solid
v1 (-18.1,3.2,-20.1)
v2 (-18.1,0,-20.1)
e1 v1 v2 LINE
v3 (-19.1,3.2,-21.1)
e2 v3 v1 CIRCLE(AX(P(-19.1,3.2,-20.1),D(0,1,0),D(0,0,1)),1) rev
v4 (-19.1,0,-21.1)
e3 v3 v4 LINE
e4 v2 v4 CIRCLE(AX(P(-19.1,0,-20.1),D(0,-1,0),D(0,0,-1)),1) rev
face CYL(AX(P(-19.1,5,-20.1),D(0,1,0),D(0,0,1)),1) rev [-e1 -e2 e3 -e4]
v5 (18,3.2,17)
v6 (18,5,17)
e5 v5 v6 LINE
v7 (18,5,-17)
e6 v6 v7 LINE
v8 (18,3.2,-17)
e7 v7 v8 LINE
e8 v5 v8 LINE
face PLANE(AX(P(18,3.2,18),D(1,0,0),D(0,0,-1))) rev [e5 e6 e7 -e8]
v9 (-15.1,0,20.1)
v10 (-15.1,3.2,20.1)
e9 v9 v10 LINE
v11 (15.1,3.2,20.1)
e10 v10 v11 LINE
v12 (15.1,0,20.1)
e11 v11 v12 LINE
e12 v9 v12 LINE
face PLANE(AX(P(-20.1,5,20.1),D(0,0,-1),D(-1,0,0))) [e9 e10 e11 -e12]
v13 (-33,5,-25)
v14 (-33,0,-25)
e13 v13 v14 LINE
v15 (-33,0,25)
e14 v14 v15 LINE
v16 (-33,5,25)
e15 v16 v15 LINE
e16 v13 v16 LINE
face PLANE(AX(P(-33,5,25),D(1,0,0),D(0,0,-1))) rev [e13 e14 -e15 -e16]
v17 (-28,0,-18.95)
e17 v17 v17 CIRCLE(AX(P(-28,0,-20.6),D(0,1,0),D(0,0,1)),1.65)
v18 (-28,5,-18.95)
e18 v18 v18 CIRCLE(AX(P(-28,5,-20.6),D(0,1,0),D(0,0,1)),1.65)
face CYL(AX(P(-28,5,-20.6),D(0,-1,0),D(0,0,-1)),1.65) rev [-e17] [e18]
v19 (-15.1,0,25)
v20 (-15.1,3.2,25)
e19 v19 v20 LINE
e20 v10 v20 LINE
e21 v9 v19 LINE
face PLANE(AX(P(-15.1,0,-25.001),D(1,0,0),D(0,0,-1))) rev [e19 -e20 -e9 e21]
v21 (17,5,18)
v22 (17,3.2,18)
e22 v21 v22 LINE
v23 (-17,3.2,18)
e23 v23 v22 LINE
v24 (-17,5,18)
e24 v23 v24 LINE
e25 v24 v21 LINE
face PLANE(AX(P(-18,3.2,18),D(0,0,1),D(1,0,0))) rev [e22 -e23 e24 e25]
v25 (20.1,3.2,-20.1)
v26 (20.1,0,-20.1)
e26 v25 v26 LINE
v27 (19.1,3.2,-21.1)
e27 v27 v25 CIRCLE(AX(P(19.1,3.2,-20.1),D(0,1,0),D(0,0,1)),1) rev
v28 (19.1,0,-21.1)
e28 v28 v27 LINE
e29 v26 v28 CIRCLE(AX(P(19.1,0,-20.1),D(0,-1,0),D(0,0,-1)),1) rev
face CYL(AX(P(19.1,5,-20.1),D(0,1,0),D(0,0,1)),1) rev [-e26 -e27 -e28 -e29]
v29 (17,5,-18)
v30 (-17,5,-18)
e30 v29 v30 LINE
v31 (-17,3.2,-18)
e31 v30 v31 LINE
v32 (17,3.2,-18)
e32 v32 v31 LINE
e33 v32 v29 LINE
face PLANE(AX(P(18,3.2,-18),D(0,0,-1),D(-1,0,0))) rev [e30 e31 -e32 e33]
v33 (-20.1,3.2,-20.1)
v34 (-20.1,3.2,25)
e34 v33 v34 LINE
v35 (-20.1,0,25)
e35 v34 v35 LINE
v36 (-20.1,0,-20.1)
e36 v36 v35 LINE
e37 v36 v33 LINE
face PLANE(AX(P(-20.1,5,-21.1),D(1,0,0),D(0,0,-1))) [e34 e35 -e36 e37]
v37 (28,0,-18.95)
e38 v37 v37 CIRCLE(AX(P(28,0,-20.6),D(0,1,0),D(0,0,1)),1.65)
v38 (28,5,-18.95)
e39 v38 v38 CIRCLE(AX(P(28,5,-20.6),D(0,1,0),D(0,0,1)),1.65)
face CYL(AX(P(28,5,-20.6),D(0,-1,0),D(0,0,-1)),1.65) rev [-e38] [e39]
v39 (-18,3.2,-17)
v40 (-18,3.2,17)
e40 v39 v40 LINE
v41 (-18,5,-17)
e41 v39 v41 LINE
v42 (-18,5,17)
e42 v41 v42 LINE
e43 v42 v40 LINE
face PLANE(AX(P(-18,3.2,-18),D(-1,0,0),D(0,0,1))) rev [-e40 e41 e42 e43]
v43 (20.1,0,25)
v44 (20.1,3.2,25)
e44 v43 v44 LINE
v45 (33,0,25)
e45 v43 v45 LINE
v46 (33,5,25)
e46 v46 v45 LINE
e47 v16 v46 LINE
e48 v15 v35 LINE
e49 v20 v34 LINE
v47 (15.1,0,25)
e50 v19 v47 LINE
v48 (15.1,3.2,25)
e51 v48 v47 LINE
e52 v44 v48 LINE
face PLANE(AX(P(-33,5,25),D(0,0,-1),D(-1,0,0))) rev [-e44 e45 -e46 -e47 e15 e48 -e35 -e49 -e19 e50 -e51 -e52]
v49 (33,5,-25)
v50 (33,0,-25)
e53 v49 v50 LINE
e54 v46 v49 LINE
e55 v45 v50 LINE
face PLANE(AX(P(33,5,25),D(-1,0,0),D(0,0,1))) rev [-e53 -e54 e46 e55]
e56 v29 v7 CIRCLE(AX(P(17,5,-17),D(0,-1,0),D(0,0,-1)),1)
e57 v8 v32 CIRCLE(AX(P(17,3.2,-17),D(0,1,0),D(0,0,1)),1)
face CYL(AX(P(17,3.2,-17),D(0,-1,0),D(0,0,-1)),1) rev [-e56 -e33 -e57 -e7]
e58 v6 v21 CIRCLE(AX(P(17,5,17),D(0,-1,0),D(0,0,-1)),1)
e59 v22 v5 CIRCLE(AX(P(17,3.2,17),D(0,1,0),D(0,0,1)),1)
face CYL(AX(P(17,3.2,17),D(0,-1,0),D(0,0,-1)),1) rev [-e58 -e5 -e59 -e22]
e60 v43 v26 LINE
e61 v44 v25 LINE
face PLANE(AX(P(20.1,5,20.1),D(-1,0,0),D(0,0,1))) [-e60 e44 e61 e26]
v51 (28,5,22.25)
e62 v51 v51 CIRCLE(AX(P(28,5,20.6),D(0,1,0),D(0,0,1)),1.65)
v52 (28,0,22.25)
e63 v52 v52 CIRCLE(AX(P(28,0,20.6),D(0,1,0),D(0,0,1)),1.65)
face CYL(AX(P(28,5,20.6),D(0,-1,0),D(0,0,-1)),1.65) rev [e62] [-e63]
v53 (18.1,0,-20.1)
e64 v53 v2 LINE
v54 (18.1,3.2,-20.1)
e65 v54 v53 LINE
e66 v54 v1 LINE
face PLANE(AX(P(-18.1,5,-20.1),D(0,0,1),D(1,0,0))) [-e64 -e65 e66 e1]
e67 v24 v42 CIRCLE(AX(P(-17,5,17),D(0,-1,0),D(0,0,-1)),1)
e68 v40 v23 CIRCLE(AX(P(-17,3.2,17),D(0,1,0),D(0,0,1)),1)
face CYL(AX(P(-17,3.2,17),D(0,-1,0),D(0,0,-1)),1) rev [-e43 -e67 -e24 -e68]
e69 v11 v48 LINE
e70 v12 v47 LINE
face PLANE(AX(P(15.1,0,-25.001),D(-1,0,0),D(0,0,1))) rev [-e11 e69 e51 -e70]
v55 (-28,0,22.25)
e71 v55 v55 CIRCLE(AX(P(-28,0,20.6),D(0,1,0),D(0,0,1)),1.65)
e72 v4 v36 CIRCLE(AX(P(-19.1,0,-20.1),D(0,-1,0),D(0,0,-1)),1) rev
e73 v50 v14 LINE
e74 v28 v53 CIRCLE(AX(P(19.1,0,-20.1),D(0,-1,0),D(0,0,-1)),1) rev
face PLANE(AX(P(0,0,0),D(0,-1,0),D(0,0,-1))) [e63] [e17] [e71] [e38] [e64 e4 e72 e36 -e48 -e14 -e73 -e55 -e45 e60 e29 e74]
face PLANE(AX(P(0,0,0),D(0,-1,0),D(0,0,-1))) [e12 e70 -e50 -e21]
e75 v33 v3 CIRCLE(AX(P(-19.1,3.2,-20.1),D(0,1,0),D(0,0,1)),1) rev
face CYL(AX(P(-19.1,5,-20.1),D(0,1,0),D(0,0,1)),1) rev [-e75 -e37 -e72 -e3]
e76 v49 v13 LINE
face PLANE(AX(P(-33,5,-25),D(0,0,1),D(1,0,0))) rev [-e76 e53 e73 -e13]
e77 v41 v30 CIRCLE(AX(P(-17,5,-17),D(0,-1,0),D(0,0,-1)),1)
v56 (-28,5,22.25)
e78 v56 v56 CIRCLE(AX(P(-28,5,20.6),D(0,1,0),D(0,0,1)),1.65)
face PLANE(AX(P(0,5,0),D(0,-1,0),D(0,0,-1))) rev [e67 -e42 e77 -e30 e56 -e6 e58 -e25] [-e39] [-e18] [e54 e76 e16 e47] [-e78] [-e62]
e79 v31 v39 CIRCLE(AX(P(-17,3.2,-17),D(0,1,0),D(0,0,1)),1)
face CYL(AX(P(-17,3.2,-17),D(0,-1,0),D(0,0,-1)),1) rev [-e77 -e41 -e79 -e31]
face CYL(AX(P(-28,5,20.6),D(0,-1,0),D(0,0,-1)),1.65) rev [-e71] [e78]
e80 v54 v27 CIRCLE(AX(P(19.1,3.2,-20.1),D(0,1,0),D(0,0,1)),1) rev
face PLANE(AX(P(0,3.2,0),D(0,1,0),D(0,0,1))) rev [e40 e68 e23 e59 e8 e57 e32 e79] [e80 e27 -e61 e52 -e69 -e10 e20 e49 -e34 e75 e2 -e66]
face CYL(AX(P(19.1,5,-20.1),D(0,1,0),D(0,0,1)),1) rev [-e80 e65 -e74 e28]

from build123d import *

# Parameters (mm, degrees)
SKETCH1_W           = 66
SKETCH1_H           = 50
SKETCH1_R           = 1.65
BOSS_EXTRUDE1_DEPTH = 5
SKETCH2_W           = 36
SKETCH2_H           = 36
BOSS_EXTRUDE2_DEPTH = 1.8
CUT_EXTRUDE1_REACH  = 62.117
SKETCH3_W           = 5
SKETCH3_H           = 3.2
FILLET1_R           = 1


with BuildPart() as part:
    # Sketch1 → Boss-Extrude1 (new body)
    with BuildSketch(Plane(origin=(0, 0, 0), x_dir=(1, 0, 0), z_dir=(0, 1, 0))):
        Rectangle(SKETCH1_W, SKETCH1_H)
        with Locations(Location((-28, 20.6, 0), (0, 0, 270))):
            Circle(SKETCH1_R, mode=Mode.SUBTRACT)
        with Locations(Location((28, 20.6, 0), (0, 0, 270))):
            Circle(SKETCH1_R, mode=Mode.SUBTRACT)
        with Locations(Location((-28, -20.6, 0), (0, 0, 270))):
            Circle(SKETCH1_R, mode=Mode.SUBTRACT)
        with Locations(Location((28, -20.6, 0), (0, 0, 270))):
            Circle(SKETCH1_R, mode=Mode.SUBTRACT)
        Polygon((20.1, -20.1), (20.1, 21.1), (18.1, 21.1), (18.1, 20.1), (-18.1, 20.1), (-18.1, 21.1), (-20.1, 21.1), (-20.1, -20.1), align=None, mode=Mode.SUBTRACT)
    extrude(amount=BOSS_EXTRUDE1_DEPTH)

    # Sketch2 → Boss-Extrude2 (add)
    with BuildSketch(Plane(origin=(0, 5, 0), x_dir=(1, 0, 0), z_dir=(0, 1, 0))):
        Polygon((-20.1, 21.1), (-20.1, -20.1), (20.1, -20.1), (20.1, 21.1), (18.1, 21.1), (18.1, 20.1), (-18.1, 20.1), (-18.1, 21.1), align=None)
        Rectangle(SKETCH2_W, SKETCH2_H, mode=Mode.SUBTRACT)
    extrude(amount=-BOSS_EXTRUDE2_DEPTH)

    # Sketch3 → Cut-Extrude1 (cut, up to next)
    with BuildSketch(Plane.XY.offset(25), mode=Mode.PRIVATE) as cut_extrude1_sk1:
        with Locations((-17.6, 1.6)):
            Rectangle(SKETCH3_W, SKETCH3_H)
    cut_extrude1_tool1 = extrude(cut_extrude1_sk1.sketch, amount=-CUT_EXTRUDE1_REACH, mode=Mode.PRIVATE) & part.part
    # Sketch3 → Cut-Extrude1 (cut, up to next)
    with BuildSketch(Plane.XY.offset(25), mode=Mode.PRIVATE) as cut_extrude1_sk2:
        with Locations((17.6, 1.6)):
            Rectangle(SKETCH3_W, SKETCH3_H)
    cut_extrude1_tool2 = extrude(cut_extrude1_sk2.sketch, amount=-CUT_EXTRUDE1_REACH, mode=Mode.PRIVATE) & part.part
    add(cut_extrude1_tool1.solids().sort_by_distance((-17.6, 1.6, 25))[0], mode=Mode.SUBTRACT)
    add(cut_extrude1_tool2.solids().sort_by_distance((17.6, 1.6, 25))[0], mode=Mode.SUBTRACT)

    # Fillet1
    fillet1_edges = [part.edges().sort_by_distance(p)[0] for p in [
        (-18, 4.1, 18),
        (18, 4.1, 18),
        (18, 4.1, -18),
        (-18, 4.1, -18),
        (-20.1, 1.6, -21.1),
        (-18.1, 1.6, -21.1),
        (18.1, 1.6, -21.1),
        (20.1, 1.6, -21.1),
    ]]
    fillet(fillet1_edges, radius=FILLET1_R - 0.0001)  # a hair under: the kernel refuses the full size


solid = part.part
